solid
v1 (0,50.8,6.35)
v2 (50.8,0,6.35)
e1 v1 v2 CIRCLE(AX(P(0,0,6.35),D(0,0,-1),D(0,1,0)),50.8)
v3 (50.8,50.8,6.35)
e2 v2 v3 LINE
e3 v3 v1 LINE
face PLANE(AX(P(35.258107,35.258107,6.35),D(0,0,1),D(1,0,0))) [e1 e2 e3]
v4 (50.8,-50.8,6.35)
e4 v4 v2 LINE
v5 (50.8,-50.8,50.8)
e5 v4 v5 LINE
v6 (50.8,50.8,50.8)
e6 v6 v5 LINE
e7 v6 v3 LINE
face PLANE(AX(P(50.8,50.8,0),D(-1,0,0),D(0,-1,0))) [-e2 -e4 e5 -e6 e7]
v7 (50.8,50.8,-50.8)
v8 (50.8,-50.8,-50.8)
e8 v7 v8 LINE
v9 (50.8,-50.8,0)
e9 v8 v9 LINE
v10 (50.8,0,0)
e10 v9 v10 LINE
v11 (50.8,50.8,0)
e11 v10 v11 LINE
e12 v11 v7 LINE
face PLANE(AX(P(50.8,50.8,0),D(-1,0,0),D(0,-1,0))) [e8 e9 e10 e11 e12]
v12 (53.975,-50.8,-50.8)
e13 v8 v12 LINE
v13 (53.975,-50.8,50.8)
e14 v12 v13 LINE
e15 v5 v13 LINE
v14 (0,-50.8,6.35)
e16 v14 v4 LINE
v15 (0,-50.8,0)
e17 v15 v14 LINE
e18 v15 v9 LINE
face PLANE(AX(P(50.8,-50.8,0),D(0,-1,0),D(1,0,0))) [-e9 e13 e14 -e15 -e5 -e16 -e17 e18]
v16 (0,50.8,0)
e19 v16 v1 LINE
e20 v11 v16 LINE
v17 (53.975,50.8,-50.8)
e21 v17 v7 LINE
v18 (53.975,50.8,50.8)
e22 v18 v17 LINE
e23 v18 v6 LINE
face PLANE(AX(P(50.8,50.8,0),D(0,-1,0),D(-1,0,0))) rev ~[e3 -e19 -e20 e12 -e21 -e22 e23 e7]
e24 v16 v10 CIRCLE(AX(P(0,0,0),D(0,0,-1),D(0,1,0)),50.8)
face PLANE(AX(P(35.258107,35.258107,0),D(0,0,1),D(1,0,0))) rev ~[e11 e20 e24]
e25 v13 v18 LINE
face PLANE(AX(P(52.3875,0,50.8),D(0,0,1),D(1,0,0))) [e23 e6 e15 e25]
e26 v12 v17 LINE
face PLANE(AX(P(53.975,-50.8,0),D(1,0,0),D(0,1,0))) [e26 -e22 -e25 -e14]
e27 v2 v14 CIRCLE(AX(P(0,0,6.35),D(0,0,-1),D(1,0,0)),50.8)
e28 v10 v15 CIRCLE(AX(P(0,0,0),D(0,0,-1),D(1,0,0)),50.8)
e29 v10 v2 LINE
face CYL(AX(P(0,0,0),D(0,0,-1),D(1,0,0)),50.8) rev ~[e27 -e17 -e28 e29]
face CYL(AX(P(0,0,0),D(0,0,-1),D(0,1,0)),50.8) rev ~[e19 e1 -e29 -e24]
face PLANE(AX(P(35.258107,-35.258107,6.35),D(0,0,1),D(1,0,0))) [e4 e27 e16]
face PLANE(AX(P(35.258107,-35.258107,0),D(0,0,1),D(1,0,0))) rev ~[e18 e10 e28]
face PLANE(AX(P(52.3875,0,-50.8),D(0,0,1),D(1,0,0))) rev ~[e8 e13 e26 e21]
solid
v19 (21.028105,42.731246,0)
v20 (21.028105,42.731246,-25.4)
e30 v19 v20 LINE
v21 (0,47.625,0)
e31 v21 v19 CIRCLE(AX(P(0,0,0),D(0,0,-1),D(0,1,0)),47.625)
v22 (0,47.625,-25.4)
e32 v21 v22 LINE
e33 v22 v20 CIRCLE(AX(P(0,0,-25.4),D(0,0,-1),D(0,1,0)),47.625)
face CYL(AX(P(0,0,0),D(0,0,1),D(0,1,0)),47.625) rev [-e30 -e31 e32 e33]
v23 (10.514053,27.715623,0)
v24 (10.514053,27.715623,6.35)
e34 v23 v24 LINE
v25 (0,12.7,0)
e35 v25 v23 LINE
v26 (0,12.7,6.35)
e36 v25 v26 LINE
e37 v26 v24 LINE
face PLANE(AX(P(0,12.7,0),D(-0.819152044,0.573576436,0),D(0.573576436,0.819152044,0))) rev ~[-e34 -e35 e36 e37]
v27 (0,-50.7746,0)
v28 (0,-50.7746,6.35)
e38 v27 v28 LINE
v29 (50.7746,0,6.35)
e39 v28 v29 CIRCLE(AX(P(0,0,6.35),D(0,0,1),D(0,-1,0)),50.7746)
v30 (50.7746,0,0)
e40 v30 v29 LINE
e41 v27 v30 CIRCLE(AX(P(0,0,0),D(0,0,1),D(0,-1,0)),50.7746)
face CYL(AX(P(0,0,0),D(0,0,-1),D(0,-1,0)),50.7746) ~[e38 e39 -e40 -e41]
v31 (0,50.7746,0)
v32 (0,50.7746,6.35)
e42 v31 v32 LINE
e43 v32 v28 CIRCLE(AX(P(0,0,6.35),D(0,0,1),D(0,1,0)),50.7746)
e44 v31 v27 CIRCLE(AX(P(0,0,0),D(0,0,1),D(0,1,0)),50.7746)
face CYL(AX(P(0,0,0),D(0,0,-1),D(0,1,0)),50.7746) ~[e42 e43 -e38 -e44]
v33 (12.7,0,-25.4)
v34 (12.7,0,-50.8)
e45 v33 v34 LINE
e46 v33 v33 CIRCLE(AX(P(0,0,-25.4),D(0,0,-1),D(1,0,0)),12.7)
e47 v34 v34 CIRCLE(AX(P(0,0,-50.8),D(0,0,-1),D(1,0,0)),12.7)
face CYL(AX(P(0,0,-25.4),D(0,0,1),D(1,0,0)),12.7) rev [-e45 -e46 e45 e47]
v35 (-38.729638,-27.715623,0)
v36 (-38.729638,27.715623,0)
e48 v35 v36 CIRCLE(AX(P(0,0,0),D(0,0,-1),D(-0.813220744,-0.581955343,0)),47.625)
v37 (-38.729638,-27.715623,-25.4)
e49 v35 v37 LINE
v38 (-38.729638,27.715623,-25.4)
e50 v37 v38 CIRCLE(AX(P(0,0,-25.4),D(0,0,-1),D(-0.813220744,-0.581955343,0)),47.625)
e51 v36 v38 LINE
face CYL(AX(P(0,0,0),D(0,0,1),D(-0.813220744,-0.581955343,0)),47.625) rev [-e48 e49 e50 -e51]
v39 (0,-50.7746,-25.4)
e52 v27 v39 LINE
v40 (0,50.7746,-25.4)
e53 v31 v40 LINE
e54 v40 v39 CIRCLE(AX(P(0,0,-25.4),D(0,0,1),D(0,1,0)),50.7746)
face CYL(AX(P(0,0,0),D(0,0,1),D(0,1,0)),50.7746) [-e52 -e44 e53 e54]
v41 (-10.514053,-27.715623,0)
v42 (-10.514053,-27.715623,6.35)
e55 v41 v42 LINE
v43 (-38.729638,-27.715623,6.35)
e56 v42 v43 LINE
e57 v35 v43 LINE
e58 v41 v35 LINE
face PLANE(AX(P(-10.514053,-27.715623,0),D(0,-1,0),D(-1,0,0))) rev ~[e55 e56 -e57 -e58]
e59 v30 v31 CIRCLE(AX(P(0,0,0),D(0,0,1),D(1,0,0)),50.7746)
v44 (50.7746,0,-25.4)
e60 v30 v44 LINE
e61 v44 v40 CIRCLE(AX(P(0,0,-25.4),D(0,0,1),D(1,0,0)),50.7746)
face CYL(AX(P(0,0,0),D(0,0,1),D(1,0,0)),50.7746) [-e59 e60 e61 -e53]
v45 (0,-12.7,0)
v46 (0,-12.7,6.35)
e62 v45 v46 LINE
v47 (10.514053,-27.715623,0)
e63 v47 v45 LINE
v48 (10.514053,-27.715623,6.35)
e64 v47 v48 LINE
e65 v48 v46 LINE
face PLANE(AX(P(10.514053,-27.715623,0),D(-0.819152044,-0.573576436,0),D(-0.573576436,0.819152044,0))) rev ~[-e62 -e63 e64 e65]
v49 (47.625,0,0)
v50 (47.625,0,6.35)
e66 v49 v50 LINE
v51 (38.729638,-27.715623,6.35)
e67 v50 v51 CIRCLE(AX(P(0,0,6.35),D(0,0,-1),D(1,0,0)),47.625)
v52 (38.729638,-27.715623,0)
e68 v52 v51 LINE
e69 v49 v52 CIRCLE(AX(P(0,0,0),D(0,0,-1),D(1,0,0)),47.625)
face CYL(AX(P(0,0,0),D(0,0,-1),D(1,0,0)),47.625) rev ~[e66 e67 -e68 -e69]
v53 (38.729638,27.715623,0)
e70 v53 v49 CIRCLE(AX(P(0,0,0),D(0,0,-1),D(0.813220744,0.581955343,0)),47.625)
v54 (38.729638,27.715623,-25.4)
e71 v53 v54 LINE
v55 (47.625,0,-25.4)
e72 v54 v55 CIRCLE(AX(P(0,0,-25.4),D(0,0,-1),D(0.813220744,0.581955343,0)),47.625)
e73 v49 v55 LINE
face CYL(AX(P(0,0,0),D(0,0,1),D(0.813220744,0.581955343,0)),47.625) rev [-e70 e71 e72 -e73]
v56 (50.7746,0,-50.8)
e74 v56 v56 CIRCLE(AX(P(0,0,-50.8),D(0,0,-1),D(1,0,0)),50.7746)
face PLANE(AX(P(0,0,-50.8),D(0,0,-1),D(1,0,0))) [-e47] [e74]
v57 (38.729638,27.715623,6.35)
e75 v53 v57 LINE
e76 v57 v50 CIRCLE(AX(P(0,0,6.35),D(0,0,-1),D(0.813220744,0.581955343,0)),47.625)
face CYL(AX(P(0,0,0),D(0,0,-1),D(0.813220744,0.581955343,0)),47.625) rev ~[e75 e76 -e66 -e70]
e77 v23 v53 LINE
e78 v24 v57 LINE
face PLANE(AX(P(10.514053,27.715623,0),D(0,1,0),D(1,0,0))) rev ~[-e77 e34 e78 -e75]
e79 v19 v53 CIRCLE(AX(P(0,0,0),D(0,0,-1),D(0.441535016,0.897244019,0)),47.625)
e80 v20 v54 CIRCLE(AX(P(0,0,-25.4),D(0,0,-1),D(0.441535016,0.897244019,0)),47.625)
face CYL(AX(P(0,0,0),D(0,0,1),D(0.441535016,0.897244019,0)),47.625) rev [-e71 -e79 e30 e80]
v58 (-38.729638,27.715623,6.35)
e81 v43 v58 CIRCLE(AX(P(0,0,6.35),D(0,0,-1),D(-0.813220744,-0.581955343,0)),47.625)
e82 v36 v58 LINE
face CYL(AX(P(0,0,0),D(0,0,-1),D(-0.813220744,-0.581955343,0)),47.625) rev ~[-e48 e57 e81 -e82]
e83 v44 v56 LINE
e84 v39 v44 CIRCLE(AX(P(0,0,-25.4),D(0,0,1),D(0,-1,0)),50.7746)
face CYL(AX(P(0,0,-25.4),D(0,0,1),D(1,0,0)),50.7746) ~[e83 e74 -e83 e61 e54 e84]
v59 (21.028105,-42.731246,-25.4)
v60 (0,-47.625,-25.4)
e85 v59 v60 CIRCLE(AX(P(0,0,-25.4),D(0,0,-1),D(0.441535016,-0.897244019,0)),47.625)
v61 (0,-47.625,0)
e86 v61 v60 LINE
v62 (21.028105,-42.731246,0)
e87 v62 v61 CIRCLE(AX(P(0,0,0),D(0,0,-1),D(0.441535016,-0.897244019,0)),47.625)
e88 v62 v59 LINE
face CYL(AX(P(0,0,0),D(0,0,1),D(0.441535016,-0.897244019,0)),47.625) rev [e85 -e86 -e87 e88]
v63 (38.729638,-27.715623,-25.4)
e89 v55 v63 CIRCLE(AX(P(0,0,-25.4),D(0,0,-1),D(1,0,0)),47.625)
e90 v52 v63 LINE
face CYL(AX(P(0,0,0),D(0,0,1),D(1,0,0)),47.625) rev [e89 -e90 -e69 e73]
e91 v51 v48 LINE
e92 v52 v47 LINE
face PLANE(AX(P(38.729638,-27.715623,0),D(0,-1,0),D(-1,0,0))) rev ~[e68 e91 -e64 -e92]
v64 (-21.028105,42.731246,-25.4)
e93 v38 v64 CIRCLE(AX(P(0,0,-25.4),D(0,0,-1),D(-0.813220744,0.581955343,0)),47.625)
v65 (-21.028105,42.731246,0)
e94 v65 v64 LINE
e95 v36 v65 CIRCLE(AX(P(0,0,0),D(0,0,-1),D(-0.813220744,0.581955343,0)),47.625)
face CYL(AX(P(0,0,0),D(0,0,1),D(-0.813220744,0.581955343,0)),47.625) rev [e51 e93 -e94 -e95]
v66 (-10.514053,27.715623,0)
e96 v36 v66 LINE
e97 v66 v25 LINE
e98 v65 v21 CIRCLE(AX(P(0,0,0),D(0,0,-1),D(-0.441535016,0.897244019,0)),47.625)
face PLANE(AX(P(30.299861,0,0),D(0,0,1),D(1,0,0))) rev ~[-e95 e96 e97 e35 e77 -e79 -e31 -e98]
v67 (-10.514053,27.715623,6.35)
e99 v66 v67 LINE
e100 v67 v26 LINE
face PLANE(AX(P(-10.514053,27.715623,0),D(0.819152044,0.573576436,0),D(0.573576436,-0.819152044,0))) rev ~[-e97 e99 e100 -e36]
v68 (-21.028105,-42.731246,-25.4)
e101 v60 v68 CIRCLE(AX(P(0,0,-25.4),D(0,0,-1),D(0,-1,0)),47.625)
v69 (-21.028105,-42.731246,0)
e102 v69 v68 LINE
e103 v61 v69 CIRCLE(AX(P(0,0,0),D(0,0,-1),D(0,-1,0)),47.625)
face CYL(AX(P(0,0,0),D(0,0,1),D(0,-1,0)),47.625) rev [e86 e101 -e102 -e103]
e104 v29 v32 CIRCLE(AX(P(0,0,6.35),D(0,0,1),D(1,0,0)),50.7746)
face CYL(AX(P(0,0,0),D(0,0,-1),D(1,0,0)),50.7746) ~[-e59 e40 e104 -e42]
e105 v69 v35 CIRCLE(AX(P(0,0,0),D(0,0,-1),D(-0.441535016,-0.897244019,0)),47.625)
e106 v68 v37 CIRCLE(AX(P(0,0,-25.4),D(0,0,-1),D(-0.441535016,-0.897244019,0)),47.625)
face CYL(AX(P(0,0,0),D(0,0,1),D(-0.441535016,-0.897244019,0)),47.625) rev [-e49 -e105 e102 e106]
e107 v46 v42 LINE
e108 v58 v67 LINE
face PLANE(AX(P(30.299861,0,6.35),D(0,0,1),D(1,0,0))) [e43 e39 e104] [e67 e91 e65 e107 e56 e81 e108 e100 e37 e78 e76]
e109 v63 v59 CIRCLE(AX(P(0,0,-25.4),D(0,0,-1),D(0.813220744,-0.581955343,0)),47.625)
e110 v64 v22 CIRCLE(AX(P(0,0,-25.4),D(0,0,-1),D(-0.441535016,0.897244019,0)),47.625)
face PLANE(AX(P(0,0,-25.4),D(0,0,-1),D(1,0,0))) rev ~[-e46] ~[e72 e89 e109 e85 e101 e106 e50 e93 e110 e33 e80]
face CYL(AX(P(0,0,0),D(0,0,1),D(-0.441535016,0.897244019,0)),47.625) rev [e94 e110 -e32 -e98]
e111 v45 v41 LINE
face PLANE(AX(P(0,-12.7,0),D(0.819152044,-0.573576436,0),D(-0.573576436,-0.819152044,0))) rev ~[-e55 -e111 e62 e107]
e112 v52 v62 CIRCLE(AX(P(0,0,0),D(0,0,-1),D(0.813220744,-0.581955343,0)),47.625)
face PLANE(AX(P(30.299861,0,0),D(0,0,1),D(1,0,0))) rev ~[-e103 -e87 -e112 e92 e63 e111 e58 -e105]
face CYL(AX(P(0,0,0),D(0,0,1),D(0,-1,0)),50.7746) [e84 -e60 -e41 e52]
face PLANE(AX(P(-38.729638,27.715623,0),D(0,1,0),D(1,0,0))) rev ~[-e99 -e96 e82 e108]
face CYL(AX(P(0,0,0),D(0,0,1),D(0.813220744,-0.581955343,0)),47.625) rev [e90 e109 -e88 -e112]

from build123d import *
from build123d import SkipClean  # not in build123d's __all__

# Parameters (mm, degrees)
F1_DEPTH = 50.8
F2_DEPTH = 6.35
F3_DEPTH = 25.4
F4_R     = 50.7746
F4_R_2   = 47.625
F4_R_3   = 12.7
F5_DEPTH = 25.4


# Not quite as in the source:
# - after a boolean that leaves OpenCascade's solid faulty, fix() repairs it


with BuildPart() as f1:
    # F0 (on Top) → F1 (new body, symmetric)
    with BuildSketch(Plane.XY):
        Polygon((50.8, 50.8), (50.8, 0), (50.8, -50.8), (53.975, -50.8), (53.975, 50.8), align=None)
    extrude(amount=F1_DEPTH, both=True)

    # F0 (on Top) → F2 (join)
    with BuildSketch(Plane.XY):
        with BuildLine():
            Line((50.8, 50.8), (0, 50.8))
            ThreePointArc((0, 50.8), (35.9210244843, 35.9210244843), (50.8, 0))
            Line((50.8, 0), (50.8, 50.8))
        make_face()
        with BuildLine():
            ThreePointArc((50.8, 0), (35.9210244843, -35.9210244843), (0, -50.8))
            Line((0, -50.8), (50.8, -50.8))
            Line((50.8, -50.8), (50.8, 0))
        make_face()
    extrude(amount=F2_DEPTH)


with BuildPart() as f2:
    # F0 (on Top) → F2, piece 2 (new body)
    with BuildSketch(Plane.XY):
        with BuildLine():
            ThreePointArc((38.7296379439, 27.7156232067), (45.3466626781, 14.5540650322), (47.625, 0))
            ThreePointArc((47.625, 0), (45.3466626781, -14.5540650322), (38.7296379439, -27.7156232067))
            ThreePointArc((38.7296379439, -27.7156232067), (30.8076970757, -36.318403405), (21.0281051205, -42.7312464134))
            ThreePointArc((21.0281051205, -42.7312464134), (10.7950223382, -46.3854300155), (0, -47.625))
            Line((0, -47.625), (0, -50.7746))
            ThreePointArc((0, -50.7746), (35.903063972, -35.903063972), (50.7746, 0))
            ThreePointArc((50.7746, 0), (35.903063972, 35.903063972), (0, 50.7746))
            Line((0, 50.7746), (0, 47.625))
            ThreePointArc((0, 47.625), (10.7950223382, 46.3854300155), (21.0281051205, 42.7312464134))
            ThreePointArc((21.0281051205, 42.7312464134), (30.8076970757, 36.318403405), (38.7296379439, 27.7156232067))
        make_face()
        with BuildLine():
            ThreePointArc((-21.0281051205, 42.7312464134), (-10.7950223382, 46.3854300155), (0, 47.625))
            Line((0, 47.625), (0, 50.7746))
            ThreePointArc((0, 50.7746), (-50.7746, 0), (0, -50.7746))
            Line((0, -50.7746), (0, -47.625))
            ThreePointArc((0, -47.625), (-10.7950223382, -46.3854300155), (-21.0281051205, -42.7312464134))
            ThreePointArc((-21.0281051205, -42.7312464134), (-30.8076970757, -36.318403405), (-38.7296379439, -27.7156232067))
            ThreePointArc((-38.7296379439, -27.7156232067), (-47.625, 0), (-38.7296379439, 27.7156232067))
            ThreePointArc((-38.7296379439, 27.7156232067), (-30.8076970757, 36.318403405), (-21.0281051205, 42.7312464134))
        make_face()
        with BuildLine():
            Line((-10.5140525602, 27.7156232067), (-21.0281051205, 42.7312464134))
            ThreePointArc((-21.0281051205, 42.7312464134), (-30.8076970757, 36.318403405), (-38.7296379439, 27.7156232067))
            Line((-38.7296379439, 27.7156232067), (-10.5140525602, 27.7156232067))
        make_face()
        with BuildLine():
            Line((0, 12.7), (0, 47.625))
            ThreePointArc((0, 47.625), (-10.7950223382, 46.3854300155), (-21.0281051205, 42.7312464134))
            Line((-21.0281051205, 42.7312464134), (-10.5140525602, 27.7156232067))
            Line((-10.5140525602, 27.7156232067), (0, 12.7))
        make_face()
        with BuildLine():
            Line((10.5140525602, 27.7156232067), (21.0281051205, 42.7312464134))
            ThreePointArc((21.0281051205, 42.7312464134), (10.7950223382, 46.3854300155), (0, 47.625))
            Line((0, 47.625), (0, 12.7))
            Line((0, 12.7), (10.5140525602, 27.7156232067))
        make_face()
        with BuildLine():
            Line((10.5140525602, 27.7156232067), (38.7296379439, 27.7156232067))
            ThreePointArc((38.7296379439, 27.7156232067), (30.8076970757, 36.318403405), (21.0281051205, 42.7312464134))
            Line((21.0281051205, 42.7312464134), (10.5140525602, 27.7156232067))
        make_face()
        with BuildLine():
            ThreePointArc((21.0281051205, -42.7312464134), (30.8076970757, -36.318403405), (38.7296379439, -27.7156232067))
            Line((38.7296379439, -27.7156232067), (10.5140525602, -27.7156232067))
            Line((10.5140525602, -27.7156232067), (21.0281051205, -42.7312464134))
        make_face()
        with BuildLine():
            ThreePointArc((0, -47.625), (10.7950223382, -46.3854300155), (21.0281051205, -42.7312464134))
            Line((21.0281051205, -42.7312464134), (10.5140525602, -27.7156232067))
            Line((10.5140525602, -27.7156232067), (0, -12.7))
            Line((0, -12.7), (0, -47.625))
        make_face()
        with BuildLine():
            ThreePointArc((-21.0281051205, -42.7312464134), (-10.7950223382, -46.3854300155), (0, -47.625))
            Line((0, -47.625), (0, -12.7))
            Line((0, -12.7), (-10.5140525602, -27.7156232067))
            Line((-10.5140525602, -27.7156232067), (-21.0281051205, -42.7312464134))
        make_face()
        with BuildLine():
            ThreePointArc((-38.7296379439, -27.7156232067), (-30.8076970757, -36.318403405), (-21.0281051205, -42.7312464134))
            Line((-21.0281051205, -42.7312464134), (-10.5140525602, -27.7156232067))
            Line((-10.5140525602, -27.7156232067), (-38.7296379439, -27.7156232067))
        make_face()
    extrude(amount=F2_DEPTH)

    # F0 (on Top) → F3 (join)
    with BuildSketch(Plane.XY):
        with BuildLine():
            ThreePointArc((-21.0281051205, 42.7312464134), (-10.7950223382, 46.3854300155), (0, 47.625))
            Line((0, 47.625), (0, 50.7746))
            ThreePointArc((0, 50.7746), (-50.7746, 0), (0, -50.7746))
            Line((0, -50.7746), (0, -47.625))
            ThreePointArc((0, -47.625), (-10.7950223382, -46.3854300155), (-21.0281051205, -42.7312464134))
            ThreePointArc((-21.0281051205, -42.7312464134), (-30.8076970757, -36.318403405), (-38.7296379439, -27.7156232067))
            ThreePointArc((-38.7296379439, -27.7156232067), (-47.625, 0), (-38.7296379439, 27.7156232067))
            ThreePointArc((-38.7296379439, 27.7156232067), (-30.8076970757, 36.318403405), (-21.0281051205, 42.7312464134))
        make_face()
        with BuildLine():
            ThreePointArc((38.7296379439, 27.7156232067), (45.3466626781, 14.5540650322), (47.625, 0))
            ThreePointArc((47.625, 0), (45.3466626781, -14.5540650322), (38.7296379439, -27.7156232067))
            ThreePointArc((38.7296379439, -27.7156232067), (30.8076970757, -36.318403405), (21.0281051205, -42.7312464134))
            ThreePointArc((21.0281051205, -42.7312464134), (10.7950223382, -46.3854300155), (0, -47.625))
            Line((0, -47.625), (0, -50.7746))
            ThreePointArc((0, -50.7746), (35.903063972, -35.903063972), (50.7746, 0))
            ThreePointArc((50.7746, 0), (35.903063972, 35.903063972), (0, 50.7746))
            Line((0, 50.7746), (0, 47.625))
            ThreePointArc((0, 47.625), (10.7950223382, 46.3854300155), (21.0281051205, 42.7312464134))
            ThreePointArc((21.0281051205, 42.7312464134), (30.8076970757, 36.318403405), (38.7296379439, 27.7156232067))
        make_face()
    with SkipClean():  # cleaning this boolean's faces spoils the solid; the shape is the same uncleaned
        extrude(amount=-F3_DEPTH)

    # F4 (on face) → F5 (join)
    with BuildSketch(Plane(origin=(0, 0, -25.4), x_dir=(1, 0, 0), z_dir=(0, 0, -1))):
        Circle(F4_R)
        Circle(F4_R_2, mode=Mode.SUBTRACT)
        Circle(F4_R_2)
        Circle(F4_R_3, mode=Mode.SUBTRACT)
    extrude(amount=F5_DEPTH)

    add(f2.part.fix(), mode=Mode.REPLACE)


solid = Compound([f1.part, f2.part])
